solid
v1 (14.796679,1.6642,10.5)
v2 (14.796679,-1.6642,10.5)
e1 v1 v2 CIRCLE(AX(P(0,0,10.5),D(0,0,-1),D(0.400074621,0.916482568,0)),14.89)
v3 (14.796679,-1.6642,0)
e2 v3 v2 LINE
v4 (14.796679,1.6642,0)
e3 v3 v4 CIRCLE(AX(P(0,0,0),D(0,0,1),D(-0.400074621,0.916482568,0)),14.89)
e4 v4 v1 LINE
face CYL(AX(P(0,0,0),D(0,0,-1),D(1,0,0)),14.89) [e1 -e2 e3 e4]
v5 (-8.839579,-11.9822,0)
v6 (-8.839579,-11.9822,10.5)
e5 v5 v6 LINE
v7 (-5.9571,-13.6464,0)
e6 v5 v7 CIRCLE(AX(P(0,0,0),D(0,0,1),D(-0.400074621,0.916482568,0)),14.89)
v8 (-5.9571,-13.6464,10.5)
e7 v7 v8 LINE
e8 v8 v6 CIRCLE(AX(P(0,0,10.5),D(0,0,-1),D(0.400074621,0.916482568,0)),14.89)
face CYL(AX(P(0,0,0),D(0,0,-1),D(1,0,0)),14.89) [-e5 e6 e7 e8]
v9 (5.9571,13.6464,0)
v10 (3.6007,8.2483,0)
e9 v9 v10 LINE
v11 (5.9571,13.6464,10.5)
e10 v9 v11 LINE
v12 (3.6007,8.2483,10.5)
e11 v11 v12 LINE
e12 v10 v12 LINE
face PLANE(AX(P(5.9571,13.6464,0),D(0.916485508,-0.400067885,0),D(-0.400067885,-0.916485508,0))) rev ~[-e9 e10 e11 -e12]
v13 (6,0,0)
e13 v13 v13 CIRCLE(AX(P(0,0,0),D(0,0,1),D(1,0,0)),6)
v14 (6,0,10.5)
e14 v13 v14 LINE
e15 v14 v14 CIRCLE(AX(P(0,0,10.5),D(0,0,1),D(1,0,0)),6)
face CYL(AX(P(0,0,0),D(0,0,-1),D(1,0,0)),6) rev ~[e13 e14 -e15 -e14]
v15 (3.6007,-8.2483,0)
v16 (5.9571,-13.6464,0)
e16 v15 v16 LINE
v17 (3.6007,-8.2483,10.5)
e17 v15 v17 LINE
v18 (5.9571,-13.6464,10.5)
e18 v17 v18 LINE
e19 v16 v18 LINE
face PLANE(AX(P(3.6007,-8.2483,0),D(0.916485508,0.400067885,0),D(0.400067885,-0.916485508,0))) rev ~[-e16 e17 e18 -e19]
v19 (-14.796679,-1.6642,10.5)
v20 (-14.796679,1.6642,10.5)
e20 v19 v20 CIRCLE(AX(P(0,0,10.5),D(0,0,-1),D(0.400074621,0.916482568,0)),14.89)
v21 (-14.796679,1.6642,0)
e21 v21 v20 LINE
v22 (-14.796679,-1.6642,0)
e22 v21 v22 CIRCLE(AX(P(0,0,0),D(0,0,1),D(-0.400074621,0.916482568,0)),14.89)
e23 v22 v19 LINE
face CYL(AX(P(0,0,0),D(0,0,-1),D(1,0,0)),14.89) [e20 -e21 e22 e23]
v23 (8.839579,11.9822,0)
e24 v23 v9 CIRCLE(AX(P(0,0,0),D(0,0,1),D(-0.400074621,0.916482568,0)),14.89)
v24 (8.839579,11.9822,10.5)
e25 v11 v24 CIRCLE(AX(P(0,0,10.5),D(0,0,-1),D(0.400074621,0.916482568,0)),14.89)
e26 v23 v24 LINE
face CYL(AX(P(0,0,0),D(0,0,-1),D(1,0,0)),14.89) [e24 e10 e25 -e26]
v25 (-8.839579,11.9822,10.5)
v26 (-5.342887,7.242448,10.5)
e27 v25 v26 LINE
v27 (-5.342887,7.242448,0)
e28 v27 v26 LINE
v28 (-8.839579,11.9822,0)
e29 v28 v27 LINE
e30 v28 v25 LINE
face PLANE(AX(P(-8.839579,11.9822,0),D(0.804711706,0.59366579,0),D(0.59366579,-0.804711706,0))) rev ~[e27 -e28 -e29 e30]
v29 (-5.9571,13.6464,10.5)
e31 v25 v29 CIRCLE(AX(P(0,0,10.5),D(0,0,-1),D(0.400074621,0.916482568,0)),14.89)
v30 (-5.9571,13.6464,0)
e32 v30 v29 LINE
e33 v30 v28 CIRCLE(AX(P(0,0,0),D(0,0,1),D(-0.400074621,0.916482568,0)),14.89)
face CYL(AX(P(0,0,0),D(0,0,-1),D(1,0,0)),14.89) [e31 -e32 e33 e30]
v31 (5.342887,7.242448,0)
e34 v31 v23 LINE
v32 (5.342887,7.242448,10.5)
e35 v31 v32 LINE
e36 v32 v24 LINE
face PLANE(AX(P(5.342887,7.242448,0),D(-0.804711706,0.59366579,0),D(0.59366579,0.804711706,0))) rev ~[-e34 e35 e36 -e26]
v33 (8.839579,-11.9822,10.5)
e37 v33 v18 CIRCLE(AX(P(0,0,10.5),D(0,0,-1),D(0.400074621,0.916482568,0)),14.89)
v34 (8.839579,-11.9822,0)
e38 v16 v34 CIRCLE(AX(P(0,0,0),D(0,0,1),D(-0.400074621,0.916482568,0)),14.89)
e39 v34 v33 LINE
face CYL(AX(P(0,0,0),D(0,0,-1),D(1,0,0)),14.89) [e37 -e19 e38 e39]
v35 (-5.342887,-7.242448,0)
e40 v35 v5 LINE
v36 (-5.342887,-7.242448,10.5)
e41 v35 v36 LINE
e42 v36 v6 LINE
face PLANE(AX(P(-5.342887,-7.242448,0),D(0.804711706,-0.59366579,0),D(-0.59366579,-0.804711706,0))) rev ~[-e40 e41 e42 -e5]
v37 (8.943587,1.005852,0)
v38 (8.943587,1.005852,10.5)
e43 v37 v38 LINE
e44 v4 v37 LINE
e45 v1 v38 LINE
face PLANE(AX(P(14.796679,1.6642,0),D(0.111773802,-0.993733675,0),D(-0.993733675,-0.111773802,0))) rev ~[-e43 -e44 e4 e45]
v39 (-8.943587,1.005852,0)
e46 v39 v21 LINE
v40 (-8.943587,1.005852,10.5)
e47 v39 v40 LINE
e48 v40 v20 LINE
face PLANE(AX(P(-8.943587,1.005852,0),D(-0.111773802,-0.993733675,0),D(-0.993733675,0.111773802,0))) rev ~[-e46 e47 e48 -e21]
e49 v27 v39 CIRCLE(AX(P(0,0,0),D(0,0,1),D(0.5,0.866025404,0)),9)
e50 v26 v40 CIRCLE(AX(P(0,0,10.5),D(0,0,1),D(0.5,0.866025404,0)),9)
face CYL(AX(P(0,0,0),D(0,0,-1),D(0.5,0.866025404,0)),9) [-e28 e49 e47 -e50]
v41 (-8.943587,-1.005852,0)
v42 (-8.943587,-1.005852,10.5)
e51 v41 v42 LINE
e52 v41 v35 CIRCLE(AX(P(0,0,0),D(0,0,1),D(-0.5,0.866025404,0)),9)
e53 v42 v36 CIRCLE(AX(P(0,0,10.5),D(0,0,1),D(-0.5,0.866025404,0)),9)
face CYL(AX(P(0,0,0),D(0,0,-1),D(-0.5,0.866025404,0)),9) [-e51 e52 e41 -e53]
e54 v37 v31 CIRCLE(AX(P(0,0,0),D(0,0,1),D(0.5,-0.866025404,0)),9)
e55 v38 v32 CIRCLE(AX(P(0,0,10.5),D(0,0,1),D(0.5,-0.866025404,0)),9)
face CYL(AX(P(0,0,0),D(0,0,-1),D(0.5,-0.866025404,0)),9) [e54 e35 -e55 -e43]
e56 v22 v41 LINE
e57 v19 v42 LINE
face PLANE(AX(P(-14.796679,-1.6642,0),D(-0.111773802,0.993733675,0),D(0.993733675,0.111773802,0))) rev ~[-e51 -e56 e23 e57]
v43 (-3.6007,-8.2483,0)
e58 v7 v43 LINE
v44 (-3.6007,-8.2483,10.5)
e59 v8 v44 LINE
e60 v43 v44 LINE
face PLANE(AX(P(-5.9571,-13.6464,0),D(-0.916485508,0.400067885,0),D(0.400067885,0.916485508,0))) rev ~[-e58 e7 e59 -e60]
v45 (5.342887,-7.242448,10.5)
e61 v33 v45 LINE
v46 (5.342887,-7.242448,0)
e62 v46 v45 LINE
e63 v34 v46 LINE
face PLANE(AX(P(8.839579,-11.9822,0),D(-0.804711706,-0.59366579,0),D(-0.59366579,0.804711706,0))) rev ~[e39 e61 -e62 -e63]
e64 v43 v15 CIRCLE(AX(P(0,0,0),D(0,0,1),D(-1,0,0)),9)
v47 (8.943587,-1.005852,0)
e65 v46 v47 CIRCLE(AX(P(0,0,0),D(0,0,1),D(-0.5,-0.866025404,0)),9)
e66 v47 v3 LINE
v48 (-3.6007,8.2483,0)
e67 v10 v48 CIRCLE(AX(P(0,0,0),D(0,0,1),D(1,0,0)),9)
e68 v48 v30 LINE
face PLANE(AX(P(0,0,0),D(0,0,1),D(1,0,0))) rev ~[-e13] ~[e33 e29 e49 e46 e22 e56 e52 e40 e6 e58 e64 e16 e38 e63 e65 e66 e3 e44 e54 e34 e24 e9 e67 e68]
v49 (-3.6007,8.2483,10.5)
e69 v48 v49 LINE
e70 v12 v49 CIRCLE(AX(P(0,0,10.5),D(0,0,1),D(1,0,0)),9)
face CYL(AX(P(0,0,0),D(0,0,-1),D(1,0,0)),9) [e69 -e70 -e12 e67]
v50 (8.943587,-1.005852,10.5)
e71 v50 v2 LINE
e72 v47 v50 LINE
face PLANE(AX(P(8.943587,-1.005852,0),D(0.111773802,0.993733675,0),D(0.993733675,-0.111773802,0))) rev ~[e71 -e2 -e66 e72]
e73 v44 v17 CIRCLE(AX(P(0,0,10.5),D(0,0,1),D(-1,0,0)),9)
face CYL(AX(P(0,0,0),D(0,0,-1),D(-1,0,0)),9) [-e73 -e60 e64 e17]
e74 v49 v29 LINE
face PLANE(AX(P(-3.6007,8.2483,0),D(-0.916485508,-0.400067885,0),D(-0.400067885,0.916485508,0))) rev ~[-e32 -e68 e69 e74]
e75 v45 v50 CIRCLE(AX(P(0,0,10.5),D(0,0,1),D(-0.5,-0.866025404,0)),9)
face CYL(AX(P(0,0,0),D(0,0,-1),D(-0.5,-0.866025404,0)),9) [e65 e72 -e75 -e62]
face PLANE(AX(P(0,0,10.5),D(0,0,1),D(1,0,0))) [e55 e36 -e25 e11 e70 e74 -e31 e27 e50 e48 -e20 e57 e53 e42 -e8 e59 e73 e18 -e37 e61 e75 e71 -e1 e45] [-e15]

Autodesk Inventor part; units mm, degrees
ref_plane "YZ Plane" through (0, 0, 0) normal (1, 0, 0) x (0, 1, 0)
ref_plane "XZ Plane" through (0, 0, 0) normal (0, 1, 0) x (-1, 0, 0)
ref_plane "XY Plane" through (0, 0, 0) normal (0, 0, 1) x (1, 0, 0)
sketch "Sketch2" plane through (0, 0, 0) normal (0, 0, 1) x (1, 0, 0)
  circle A0 centre (0, 0) radius 14.89
  circle A1 centre (0, 0) radius 9
  circle A2 centre (0, 0) radius 14.89
  line L0 (-3.6007, 8.2483) -> (-5.9571, 13.6464)
  line L1 (5.9571, 13.6464) -> (3.6007, 8.2483)
  circle A3 centre (0, 0) radius 6
  dimension "d10" = 18
  dimension "d12" = 12
extrude "Extrusion1" add sketch "Sketch2" along normal blind 10.5
extrude "Extrusion2" cut sketch "Sketch2" along normal blind 10.5 contours L1 A1 L0 A0 picked at (-1.0143, 12.8219)
pattern_circular "Circular Pattern1" count 6 over 360 about axis through (0, 0, -10) along (0, 0, 1) of "Extrusion2"
properties part number "CAO SU KHOP"
